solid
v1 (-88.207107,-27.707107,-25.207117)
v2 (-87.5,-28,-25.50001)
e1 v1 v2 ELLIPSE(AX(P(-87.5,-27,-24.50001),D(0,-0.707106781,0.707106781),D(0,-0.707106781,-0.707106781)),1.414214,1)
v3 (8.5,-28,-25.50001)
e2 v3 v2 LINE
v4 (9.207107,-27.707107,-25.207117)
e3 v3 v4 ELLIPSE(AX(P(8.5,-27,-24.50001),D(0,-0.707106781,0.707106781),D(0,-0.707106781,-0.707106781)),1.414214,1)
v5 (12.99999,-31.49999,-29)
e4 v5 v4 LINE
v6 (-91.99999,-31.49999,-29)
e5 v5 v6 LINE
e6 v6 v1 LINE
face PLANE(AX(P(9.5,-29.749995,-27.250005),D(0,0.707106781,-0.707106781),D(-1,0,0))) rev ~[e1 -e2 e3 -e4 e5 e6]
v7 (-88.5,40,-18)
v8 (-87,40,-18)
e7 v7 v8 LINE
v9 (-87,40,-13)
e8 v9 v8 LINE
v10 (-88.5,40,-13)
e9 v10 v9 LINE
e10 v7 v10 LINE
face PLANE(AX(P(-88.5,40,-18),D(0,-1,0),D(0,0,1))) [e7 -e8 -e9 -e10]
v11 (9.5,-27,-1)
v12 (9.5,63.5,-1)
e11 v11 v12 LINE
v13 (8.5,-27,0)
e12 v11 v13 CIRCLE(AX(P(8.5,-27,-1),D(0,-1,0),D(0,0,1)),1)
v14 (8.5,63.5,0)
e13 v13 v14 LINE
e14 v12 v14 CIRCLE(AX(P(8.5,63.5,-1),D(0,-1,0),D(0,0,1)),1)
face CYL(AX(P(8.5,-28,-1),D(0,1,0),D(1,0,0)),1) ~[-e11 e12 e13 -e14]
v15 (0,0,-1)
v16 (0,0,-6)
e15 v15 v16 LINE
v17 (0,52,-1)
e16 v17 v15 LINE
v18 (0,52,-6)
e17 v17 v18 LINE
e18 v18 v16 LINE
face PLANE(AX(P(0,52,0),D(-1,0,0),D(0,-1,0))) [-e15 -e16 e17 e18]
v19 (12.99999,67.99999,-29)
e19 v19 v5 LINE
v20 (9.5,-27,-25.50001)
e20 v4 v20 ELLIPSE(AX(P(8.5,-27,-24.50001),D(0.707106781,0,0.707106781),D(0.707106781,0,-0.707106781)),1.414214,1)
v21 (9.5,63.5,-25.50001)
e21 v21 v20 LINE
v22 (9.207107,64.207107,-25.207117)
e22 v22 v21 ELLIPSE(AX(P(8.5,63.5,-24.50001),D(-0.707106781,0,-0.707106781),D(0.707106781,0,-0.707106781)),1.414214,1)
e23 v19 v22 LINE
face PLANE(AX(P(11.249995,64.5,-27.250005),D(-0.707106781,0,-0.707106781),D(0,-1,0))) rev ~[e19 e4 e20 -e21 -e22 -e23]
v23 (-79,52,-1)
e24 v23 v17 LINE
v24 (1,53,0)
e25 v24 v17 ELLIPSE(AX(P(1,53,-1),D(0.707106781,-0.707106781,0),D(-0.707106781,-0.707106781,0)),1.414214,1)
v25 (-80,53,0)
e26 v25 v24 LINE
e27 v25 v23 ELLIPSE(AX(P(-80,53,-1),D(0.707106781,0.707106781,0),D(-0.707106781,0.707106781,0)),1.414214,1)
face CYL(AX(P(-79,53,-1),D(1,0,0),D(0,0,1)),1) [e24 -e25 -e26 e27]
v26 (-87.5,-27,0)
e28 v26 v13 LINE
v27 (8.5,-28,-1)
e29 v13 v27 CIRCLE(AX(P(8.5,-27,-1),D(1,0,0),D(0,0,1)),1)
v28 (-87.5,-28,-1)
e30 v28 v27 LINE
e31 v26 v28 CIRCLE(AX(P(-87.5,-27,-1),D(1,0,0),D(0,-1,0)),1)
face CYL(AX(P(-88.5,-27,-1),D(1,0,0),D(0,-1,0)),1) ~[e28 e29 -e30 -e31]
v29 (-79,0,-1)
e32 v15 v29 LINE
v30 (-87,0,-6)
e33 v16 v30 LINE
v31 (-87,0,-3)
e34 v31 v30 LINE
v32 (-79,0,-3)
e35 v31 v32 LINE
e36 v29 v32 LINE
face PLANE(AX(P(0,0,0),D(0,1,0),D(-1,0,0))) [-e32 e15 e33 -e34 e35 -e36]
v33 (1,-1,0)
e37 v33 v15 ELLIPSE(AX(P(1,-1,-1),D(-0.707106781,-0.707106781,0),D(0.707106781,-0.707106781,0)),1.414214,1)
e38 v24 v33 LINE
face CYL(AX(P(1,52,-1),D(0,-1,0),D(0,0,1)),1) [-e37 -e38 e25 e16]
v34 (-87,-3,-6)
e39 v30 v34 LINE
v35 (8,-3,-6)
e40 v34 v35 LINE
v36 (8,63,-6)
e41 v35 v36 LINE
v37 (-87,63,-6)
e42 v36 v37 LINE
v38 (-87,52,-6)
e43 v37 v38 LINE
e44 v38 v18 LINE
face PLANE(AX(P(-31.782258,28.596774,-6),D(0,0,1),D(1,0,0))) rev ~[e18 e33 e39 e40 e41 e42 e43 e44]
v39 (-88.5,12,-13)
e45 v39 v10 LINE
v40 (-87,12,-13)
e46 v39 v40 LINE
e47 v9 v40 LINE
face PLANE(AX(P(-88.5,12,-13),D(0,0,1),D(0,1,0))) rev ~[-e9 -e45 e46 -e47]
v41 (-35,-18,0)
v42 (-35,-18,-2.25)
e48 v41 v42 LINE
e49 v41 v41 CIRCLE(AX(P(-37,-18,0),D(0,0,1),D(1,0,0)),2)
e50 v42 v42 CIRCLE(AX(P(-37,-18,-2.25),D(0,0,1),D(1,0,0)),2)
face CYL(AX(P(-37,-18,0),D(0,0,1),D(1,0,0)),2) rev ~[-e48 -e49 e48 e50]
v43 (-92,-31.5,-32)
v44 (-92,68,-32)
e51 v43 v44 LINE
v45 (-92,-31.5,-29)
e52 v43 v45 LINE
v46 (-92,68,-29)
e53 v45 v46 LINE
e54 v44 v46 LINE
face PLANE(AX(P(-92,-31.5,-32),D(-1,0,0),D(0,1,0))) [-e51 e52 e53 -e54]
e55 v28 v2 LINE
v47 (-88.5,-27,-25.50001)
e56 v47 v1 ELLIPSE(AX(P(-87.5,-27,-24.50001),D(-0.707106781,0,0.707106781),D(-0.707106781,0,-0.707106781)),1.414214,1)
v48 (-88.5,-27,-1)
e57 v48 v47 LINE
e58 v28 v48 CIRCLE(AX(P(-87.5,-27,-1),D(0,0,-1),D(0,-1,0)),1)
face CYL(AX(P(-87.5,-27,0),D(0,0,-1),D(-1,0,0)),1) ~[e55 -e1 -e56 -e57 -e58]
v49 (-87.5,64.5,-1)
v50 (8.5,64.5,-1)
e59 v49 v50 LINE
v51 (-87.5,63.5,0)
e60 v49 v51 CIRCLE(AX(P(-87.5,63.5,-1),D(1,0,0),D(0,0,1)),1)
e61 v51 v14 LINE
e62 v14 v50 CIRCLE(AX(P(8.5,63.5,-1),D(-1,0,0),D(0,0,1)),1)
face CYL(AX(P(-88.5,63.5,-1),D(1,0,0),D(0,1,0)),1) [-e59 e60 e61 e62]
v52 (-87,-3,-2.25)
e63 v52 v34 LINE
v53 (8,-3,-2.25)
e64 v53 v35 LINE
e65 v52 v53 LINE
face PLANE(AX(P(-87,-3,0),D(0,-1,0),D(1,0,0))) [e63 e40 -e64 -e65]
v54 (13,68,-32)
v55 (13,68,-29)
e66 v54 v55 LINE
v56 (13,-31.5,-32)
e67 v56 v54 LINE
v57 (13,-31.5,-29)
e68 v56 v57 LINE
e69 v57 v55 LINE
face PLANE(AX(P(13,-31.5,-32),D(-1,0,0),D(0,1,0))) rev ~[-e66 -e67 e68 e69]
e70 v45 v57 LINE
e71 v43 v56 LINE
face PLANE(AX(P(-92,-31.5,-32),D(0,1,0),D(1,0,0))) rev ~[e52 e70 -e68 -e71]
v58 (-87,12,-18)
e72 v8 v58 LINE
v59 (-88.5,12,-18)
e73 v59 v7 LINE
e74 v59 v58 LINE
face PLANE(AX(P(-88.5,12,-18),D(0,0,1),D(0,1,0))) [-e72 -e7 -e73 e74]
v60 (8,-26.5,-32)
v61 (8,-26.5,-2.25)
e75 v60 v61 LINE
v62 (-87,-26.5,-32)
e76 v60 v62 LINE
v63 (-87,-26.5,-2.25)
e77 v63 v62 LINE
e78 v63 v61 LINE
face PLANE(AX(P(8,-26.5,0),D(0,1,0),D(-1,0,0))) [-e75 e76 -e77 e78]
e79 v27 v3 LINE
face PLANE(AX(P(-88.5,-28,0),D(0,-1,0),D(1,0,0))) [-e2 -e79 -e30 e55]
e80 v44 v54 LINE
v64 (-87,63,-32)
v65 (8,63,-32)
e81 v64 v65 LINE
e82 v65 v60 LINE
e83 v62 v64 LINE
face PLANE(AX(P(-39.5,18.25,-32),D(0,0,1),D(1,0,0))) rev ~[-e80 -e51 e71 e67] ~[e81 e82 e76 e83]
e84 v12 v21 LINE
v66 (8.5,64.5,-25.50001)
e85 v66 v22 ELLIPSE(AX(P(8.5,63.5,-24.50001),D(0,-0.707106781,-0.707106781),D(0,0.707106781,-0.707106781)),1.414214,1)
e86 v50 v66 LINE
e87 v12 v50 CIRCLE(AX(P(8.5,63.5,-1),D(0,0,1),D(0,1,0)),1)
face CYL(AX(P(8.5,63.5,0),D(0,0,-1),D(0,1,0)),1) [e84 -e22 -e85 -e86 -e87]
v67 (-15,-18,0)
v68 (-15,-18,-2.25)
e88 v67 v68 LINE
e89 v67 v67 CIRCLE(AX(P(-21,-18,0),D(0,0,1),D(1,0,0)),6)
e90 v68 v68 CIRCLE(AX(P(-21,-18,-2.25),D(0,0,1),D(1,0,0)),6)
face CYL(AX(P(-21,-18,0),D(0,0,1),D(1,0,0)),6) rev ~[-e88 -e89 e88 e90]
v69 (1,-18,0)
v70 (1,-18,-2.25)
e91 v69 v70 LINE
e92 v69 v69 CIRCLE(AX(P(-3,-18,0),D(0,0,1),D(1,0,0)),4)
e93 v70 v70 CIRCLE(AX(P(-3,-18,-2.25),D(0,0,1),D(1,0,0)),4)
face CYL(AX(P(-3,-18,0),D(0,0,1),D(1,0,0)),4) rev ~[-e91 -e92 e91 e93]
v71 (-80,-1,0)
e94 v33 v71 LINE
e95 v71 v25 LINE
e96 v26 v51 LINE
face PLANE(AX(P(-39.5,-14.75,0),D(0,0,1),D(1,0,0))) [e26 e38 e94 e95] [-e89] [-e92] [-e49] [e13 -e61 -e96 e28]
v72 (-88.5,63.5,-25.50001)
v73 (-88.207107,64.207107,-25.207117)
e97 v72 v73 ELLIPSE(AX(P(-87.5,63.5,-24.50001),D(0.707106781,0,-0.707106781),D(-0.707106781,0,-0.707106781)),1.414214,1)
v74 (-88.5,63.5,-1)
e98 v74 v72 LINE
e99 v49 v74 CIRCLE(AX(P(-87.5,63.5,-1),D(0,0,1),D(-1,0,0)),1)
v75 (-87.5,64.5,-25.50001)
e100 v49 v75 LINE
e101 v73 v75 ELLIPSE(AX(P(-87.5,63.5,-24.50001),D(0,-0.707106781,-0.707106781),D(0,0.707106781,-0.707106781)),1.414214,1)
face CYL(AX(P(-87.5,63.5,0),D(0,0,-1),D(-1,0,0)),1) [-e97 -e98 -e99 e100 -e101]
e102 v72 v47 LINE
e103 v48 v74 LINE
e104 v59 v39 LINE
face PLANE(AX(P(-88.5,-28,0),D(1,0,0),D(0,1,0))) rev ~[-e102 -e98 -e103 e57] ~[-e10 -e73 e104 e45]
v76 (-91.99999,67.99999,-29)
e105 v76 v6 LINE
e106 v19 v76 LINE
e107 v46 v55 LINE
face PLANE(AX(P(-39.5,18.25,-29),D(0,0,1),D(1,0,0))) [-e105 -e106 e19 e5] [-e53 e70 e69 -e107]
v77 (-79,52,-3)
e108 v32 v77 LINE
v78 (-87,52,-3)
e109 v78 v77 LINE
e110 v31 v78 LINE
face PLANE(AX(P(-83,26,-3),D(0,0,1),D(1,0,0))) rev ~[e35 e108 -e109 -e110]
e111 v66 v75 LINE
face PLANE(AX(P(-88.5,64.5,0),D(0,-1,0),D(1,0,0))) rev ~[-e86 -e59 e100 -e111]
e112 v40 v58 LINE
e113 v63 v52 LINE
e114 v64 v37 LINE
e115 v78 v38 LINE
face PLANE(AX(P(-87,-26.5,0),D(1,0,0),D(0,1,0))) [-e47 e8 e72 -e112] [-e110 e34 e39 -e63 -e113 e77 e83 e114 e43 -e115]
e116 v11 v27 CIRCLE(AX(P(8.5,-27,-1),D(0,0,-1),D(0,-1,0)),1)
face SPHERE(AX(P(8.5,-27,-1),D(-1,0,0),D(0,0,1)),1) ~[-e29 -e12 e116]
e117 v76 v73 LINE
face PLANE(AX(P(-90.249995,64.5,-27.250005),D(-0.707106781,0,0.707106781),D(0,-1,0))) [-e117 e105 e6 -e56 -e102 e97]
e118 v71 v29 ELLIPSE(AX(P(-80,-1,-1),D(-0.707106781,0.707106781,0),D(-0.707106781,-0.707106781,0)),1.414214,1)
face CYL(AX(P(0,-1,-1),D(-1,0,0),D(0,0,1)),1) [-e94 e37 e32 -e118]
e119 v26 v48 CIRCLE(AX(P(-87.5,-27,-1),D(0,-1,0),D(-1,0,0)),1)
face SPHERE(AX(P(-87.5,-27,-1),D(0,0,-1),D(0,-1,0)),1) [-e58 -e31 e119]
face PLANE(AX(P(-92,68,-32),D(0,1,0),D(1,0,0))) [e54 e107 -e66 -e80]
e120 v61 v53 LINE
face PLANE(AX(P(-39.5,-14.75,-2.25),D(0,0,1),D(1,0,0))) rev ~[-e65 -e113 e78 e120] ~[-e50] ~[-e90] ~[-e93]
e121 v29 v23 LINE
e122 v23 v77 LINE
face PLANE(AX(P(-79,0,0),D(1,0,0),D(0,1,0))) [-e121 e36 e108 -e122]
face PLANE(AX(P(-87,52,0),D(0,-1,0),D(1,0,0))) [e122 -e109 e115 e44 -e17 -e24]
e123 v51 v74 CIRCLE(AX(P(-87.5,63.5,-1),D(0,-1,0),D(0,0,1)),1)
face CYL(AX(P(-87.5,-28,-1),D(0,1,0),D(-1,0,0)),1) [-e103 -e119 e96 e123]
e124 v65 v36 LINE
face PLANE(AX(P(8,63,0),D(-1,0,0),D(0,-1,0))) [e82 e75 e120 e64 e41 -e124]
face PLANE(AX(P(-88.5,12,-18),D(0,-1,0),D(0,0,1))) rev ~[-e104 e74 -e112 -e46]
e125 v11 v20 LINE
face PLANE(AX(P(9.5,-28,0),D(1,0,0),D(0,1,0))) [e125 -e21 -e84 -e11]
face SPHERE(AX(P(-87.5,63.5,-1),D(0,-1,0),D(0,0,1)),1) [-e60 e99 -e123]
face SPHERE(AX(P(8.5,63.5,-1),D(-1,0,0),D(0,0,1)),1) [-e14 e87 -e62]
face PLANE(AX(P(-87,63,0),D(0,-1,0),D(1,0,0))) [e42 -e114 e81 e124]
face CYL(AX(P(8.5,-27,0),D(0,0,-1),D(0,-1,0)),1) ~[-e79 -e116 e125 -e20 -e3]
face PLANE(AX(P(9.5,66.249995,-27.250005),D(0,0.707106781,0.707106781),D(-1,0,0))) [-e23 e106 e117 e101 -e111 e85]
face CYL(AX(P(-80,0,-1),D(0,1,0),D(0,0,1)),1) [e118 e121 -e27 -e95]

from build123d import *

# Parameters (mm, degrees)
F1_DEPTH  = 6
F0_W      = 8
F0_H      = 52
F2_DEPTH  = 3
F0_W_2    = 98
F0_H_2    = 92.5
F3_DEPTH  = 32
F5_W      = 28
F5_H      = 5
F6_DEPTH  = 20
F0_W_3    = 95
F0_H_3    = 23.5
F0_R      = 2
F0_R_2    = 6
F0_R_3    = 4
F7_DEPTH  = 2.25
F9_W      = 105
F9_H      = 99.5
F9_W_2    = 95
F9_H_2    = 89.5
F10_DEPTH = 3
F11_SIZE  = 3.49999
F12_R     = 1


# Not quite as in the source:
# - a fillet or chamfer is up to 0.001 mm smaller than in the source, because OpenCascade refuses the exact size
# - a feature names something its author has since deleted; it is built from what else it names


with BuildPart() as f1:
    # F0 (on Top) → F1 (new body)
    with BuildSketch(Plane.XY):
        Polygon((0, 52), (0, 0), (-79, 0), (-87, 0), (-87, -3), (8, -3), (8, 63), (-87, 63), (-87, 52), (-79, 52), align=None)
    extrude(amount=-F1_DEPTH)

    # F0 (on Top) → F2 (join)
    with BuildSketch(Plane.XY):
        with Locations((-83, 26)):
            Rectangle(F0_W, F0_H)
    extrude(amount=-F2_DEPTH)

    # F0 (on Top) → F3 (join)
    with BuildSketch(Plane.XY):
        with Locations((-39.5, 18.25)):
            Rectangle(F0_W_2, F0_H_2)
        Polygon((-87, -3), (-87, 0), (-87, 52), (-87, 63), (8, 63), (8, -3), (8, -26.5), (-87, -26.5), align=None, mode=Mode.SUBTRACT)
    extrude(amount=-F3_DEPTH)

    # F5 (on offset) → F6 (cut)
    with BuildSketch(Plane.YZ.offset(-88.5)):
        with Locations((26, -15.5)):
            Rectangle(F5_W, F5_H)
    extrude(amount=F6_DEPTH, mode=Mode.SUBTRACT)

    # F0 (on Top) → F7 (join)
    with BuildSketch(Plane.XY):
        with Locations((-39.5, -14.75)):
            Rectangle(F0_W_3, F0_H_3)
        with Locations((-37, -18)):
            Circle(F0_R, mode=Mode.SUBTRACT)
        with Locations((-21, -18)):
            Circle(F0_R_2, mode=Mode.SUBTRACT)
        with Locations((-3, -18)):
            Circle(F0_R_3, mode=Mode.SUBTRACT)
    extrude(amount=-F7_DEPTH)

    # F9 (on offset) → F10 (join)
    with BuildSketch(Plane.XY.offset(-32)):
        with Locations((-39.5, 18.25)):
            Rectangle(F9_W, F9_H)
        with Locations((-39.5, 18.25)):
            Rectangle(F9_W_2, F9_H_2, mode=Mode.SUBTRACT)
    extrude(amount=F10_DEPTH)

    # F11 (size 3.5 in the source; OpenCascade refuses exactly that, so slightly less here)
    f11_edges = [f1.edges().sort_by_distance(p)[0] for p in [
        (-88.5, 18.25, -29),
        (-39.5, -28, -29),
        (9.5, 18.25, -29),
        (-39.5, 64.5, -29),
    ]]
    chamfer(f11_edges, length=F11_SIZE)

    # F12
    f12_edges = [f1.edges().sort_by_distance(p)[0] for p in [
        (-88.5, -28, -12.750005),
        (-39.5, -28, 0),
        (-88.5, 18.25, 0),
        (-39.5, 64.5, 0),
        (9.5, 18.25, 0),
        (0, 26, 0),
        (-39.5, 0, 0),
        (-79, 26, 0),
        (-39.5, 52, 0),
        (9.5, -28, -12.750005),
        (9.5, 64.5, -12.750005),
        (-88.5, 64.5, -12.750005),
    ]]
    fillet(f12_edges, radius=F12_R)


solid = f1.part
